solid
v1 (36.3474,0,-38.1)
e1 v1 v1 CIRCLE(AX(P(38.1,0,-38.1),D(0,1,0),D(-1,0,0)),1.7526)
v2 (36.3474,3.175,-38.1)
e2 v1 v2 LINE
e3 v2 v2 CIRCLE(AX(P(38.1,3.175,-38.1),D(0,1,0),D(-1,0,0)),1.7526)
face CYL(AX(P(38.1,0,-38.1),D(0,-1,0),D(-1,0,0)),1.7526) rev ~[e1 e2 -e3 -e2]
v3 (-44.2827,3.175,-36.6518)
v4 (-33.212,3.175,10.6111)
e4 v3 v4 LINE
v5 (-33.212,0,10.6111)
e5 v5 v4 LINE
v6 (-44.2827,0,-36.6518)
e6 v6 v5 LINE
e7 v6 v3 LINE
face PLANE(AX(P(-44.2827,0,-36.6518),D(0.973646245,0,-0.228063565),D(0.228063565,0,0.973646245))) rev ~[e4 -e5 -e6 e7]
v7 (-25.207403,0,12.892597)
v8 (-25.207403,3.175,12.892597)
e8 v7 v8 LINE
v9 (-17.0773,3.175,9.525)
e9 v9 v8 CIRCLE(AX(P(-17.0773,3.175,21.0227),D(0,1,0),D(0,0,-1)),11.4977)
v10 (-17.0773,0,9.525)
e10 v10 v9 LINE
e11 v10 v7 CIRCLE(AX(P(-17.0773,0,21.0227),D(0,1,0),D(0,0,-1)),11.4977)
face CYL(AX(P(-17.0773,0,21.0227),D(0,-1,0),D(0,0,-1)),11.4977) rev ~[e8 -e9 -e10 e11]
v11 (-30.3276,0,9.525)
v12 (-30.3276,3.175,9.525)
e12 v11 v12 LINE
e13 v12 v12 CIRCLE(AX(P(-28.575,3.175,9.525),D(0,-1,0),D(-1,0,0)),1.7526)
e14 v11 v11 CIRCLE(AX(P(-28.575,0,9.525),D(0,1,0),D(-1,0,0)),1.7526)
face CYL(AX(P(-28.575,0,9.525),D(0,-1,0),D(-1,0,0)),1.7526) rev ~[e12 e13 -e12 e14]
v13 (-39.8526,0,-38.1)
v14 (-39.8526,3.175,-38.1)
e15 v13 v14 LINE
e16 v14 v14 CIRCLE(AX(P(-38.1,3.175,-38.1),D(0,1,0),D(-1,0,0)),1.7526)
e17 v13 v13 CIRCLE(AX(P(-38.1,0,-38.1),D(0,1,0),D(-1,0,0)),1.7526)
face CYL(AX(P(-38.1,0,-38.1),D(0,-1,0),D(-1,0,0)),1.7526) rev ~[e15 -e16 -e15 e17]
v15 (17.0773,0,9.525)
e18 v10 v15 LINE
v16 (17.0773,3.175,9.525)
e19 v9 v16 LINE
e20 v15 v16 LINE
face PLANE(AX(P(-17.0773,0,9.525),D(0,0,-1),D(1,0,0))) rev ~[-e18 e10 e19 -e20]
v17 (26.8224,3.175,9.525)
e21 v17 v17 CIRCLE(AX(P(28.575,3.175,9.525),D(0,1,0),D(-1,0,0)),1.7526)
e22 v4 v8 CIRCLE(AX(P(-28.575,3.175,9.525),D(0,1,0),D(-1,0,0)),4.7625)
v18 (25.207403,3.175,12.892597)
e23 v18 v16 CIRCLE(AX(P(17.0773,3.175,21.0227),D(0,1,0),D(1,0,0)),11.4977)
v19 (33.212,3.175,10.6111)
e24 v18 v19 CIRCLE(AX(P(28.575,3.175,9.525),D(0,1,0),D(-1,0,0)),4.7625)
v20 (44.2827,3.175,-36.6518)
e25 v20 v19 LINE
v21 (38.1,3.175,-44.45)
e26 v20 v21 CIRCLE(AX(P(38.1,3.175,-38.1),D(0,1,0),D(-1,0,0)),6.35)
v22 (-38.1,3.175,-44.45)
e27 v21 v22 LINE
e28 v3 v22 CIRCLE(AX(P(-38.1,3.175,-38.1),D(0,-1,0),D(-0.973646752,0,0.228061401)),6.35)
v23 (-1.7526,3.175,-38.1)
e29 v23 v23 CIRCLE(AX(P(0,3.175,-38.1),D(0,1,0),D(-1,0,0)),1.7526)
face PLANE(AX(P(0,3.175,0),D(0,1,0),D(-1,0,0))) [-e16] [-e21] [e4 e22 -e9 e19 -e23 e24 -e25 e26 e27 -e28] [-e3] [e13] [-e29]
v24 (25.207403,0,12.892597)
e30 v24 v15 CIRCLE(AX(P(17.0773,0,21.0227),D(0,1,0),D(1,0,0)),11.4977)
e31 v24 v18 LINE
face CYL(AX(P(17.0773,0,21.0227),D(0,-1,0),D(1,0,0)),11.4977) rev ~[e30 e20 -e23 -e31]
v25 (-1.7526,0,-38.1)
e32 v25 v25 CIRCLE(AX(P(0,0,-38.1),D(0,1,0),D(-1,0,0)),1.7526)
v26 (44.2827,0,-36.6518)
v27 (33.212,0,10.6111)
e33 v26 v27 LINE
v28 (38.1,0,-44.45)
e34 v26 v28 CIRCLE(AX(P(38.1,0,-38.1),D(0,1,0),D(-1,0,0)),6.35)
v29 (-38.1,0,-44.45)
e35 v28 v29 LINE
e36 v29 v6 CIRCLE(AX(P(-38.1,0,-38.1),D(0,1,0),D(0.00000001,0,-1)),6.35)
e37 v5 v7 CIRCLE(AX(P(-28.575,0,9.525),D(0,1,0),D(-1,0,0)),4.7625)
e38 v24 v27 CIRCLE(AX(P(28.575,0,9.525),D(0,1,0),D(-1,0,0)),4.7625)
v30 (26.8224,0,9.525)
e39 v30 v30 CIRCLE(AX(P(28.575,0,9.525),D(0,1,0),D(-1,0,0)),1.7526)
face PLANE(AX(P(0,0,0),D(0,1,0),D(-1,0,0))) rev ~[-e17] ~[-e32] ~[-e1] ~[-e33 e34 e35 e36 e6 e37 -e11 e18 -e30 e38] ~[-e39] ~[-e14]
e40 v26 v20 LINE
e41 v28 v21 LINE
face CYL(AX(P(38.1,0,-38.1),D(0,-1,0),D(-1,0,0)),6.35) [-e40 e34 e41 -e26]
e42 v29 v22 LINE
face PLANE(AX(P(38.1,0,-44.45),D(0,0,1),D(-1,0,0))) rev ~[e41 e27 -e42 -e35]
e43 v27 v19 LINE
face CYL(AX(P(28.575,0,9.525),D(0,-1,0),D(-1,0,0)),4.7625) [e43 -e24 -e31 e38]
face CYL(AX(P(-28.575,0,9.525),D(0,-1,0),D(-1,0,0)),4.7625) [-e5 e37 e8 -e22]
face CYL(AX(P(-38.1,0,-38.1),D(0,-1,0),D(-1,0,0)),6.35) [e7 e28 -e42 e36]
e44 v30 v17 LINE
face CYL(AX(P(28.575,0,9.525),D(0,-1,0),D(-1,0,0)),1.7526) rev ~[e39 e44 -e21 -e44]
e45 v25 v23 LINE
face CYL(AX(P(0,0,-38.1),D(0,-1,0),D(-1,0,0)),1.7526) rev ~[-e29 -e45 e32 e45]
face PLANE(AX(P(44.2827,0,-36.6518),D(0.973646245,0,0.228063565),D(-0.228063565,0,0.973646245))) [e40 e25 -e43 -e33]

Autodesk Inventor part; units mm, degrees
ref_plane "YZ Plane" through (0, 0, 0) normal (1, 0, 0) x (0, 1, 0)
ref_plane "XZ Plane" through (0, 0, 0) normal (0, 1, 0) x (-1, 0, 0)
ref_plane "XY Plane" through (0, 0, 0) normal (0, 0, 1) x (1, 0, 0)
sketch "Sketch1" plane through (0, 0, 0) normal (0, 1, 0) x (-1, 0, 0)
  line L0 (101.6, 38.1) -> (-101.6, 38.1) construction
  line L1 (-101.6, 38.1) -> (-101.6, -38.1) construction
  line L2 (-101.6, -38.1) -> (101.6, -38.1) construction
  line L3 (101.6, -38.1) -> (101.6, 38.1) construction
  line L4 (101.6, 38.1) -> (-101.6, -38.1) construction
  line L5 (-101.6, 38.1) -> (101.6, -38.1) construction
  line L6 (-28.575, 66.675) -> (28.575, 66.675) construction
  line L7 (28.575, 66.675) -> (28.575, 9.525) construction
  line L8 (28.575, 9.525) -> (-28.575, 9.525)
  line L9 (-28.575, 9.525) -> (-28.575, 66.675) construction
  line L10 (-28.575, 66.675) -> (28.575, 9.525) construction
  line L11 (28.575, 66.675) -> (-28.575, 9.525) construction
  circle A0 centre (-38.1, 50.8) radius 3.175 construction
  line L12 (0, 38.1) -> (0, -38.1) construction
  circle A1 centre (-38.1, 50.8) radius 9.525 construction
  line L13 (-38.1, 60.325) -> (-28.575, 60.325) construction
  circle A2 centre (38.1, 50.8) radius 3.175 construction
  circle A3 centre (38.1, 50.8) radius 9.525 construction
  line L14 (38.1, 60.325) -> (28.575, 60.325) construction
  circle A4 centre (-76.2, -38.1) radius 1.7526 construction
  circle A5 centre (-95.25, 3.175) radius 1.7526 construction
  circle A6 centre (76.2, -38.1) radius 1.7526 construction
  circle A7 centre (95.25, 3.175) radius 1.7526 construction
  line L15 (-101.6, -38.1) -> (-101.6, 6.35) construction
  line L16 (-101.6, 6.35) -> (-44.4797, 57.8728) construction
  line L17 (101.6, -38.1) -> (101.6, 6.35) construction
  line L18 (101.6, 6.35) -> (44.4797, 57.8728) construction
  line L19 (-42.6417, 42.4275) -> (-87.975, 1.5367) construction
  line L20 (-87.975, 1.5367) -> (-87.975, -38.1) construction
  line L21 (87.975, -38.1) -> (87.975, 1.5367) construction
  line L22 (87.975, 1.5367) -> (42.6417, 42.4275) construction
  line L23 (0, -38.1) -> (-95.25, -38.1) construction
  line L24 (0, -38.1) -> (95.25, -38.1) construction
  circle A8 centre (-60.325, 35.0287) radius 1.7526 construction
  circle A9 centre (-33.3375, 31.75) radius 1.7526 construction
  line L25 (-38.1, 0) -> (-38.1, 41.275) construction
  line L26 (-38.1, 0) -> (0, 0) construction
  circle A10 centre (60.325, 35.0287) radius 1.7526 construction
  circle A11 centre (33.3375, 31.75) radius 1.7526 construction
  line L27 (38.1, 0) -> (38.1, 41.275) construction
  line L28 (38.1, 0) -> (0, 0) construction
  line L29 (-87.975, 0) -> (-65.115, 0) construction
  line L30 (-65.115, 0) -> (-65.115, -31.75) construction
  line L31 (-65.115, -31.75) -> (-87.975, -31.75) construction
  line L32 (-101.6, -38.1) -> (101.6, -38.1) construction
  line L33 (101.6, -38.1) -> (101.6, 19.05) construction
  line L34 (101.6, 19.05) -> (-101.6, 19.05) construction
  line L35 (-101.6, 19.05) -> (-101.6, -38.1) construction
  line L36 (-101.6, 19.05) -> (-87.5203, 19.05) construction
  line L37 (87.5203, 19.05) -> (101.6, 19.05) construction
  circle A12 centre (-38.1, 0) radius 3.175 construction
  circle A13 centre (-38.1, 0) radius 6.35 construction
  circle A14 centre (38.1, 0) radius 3.175 construction
  circle A15 centre (38.1, 0) radius 6.35 construction
  circle A16 centre (28.575, 9.525) radius 1.7526
  circle A17 centre (28.575, 9.525) radius 4.7625
  arc A18 (17.0773, 9.525) -> (28.575, 21.0227) centre (17.0773, 21.0227) ccw
  circle A19 centre (-28.575, 9.525) radius 1.7526
  circle A20 centre (-28.575, 9.525) radius 4.7625
  arc A21 (-28.575, 21.0227) -> (-17.0773, 9.525) centre (-17.0773, 21.0227) ccw
  arc A22 (31.4325, 5.715) -> (38.1, 19.05) centre (21.4312, 19.05) ccw construction
  arc A23 (-38.1, 19.05) -> (-31.4325, 5.715) centre (-21.4312, 19.05) ccw construction
  line L38 (-61.94, -38.1) -> (-61.94, 25.0204) construction
  line L39 (87.975, 0) -> (65.115, 0) construction
  line L40 (65.115, 0) -> (65.115, -31.75) construction
  line L41 (65.115, -31.75) -> (87.975, -31.75) construction
  line L42 (61.94, -38.1) -> (61.94, 25.0204) construction
  line L43 (-28.575, 4.7625) -> (28.575, 4.7625) construction
  line L44 (101.6, -31.75) -> (-101.6, -31.75) construction
  line L45 (-101.6, -31.75) -> (-101.6, -44.45) construction
  line L46 (-101.6, -44.45) -> (101.6, -44.45)
  line L47 (101.6, -44.45) -> (101.6, -31.75) construction
  circle A24 centre (0, -38.1) radius 1.7526
  circle A25 centre (38.1, -38.1) radius 1.7526
  circle A26 centre (-38.1, -38.1) radius 1.7526
  line L48 (101.6, -38.1) -> (76.2, -44.45) construction
  line L49 (-101.6, -38.1) -> (-76.2, -44.45) construction
  line L50 (76.2, -38.1) -> (76.2, -44.45) construction
  line L51 (-76.2, -38.1) -> (-76.2, -44.45) construction
  line L52 (59.1924, 41.2769) -> (32.488, 36.4361) construction
  circle A27 centre (60.325, 35.0287) radius 6.35 construction
  circle A28 centre (33.3375, 31.75) radius 4.7625 construction
  line L53 (-59.1924, 41.2769) -> (-32.488, 36.4361) construction
  circle A29 centre (-60.325, 35.0287) radius 6.35 construction
  circle A30 centre (-33.3375, 31.75) radius 4.7625 construction
  line L54 (-87.975, 0) -> (-65.115, 0) construction
  line L55 (-65.115, 0) -> (-65.115, -3.175) construction
  line L56 (-65.115, -3.175) -> (-87.975, -3.175) construction
  line L57 (-87.975, -3.175) -> (-87.975, 0) construction
  line L58 (-65.115, -15.875) -> (-87.975, -15.875) construction
  line L59 (-65.115, -28.575) -> (-87.975, -28.575) construction
  line L60 (-84.8, -38.1) -> (-84.8, 0.1248) construction
  line L61 (65.115, -3.175) -> (87.975, -3.175) construction
  line L62 (65.115, -15.875) -> (87.975, -15.875) construction
  line L63 (65.115, -28.575) -> (87.975, -28.575) construction
  line L64 (84.8, -38.1) -> (84.8, 0.1248) construction
  line L65 (-31.75, -31.75) -> (31.75, -31.75) construction
  line L66 (31.75, -31.75) -> (31.75, 0) construction
  line L67 (31.75, 0) -> (-31.75, 0) construction
  line L68 (-31.75, 0) -> (-31.75, -31.75) construction
  circle A31 centre (71.465, 12.7) radius 3.175 construction
  circle A32 centre (-71.465, 12.7) radius 3.175 construction
  circle A33 centre (38.1, -38.1) radius 6.35
  circle A34 centre (-38.1, -38.1) radius 6.35
  line L69 (44.2827, -36.6518) -> (33.212, 10.6111)
  line L70 (-44.2827, -36.6518) -> (-33.212, 10.6111)
  point P0 (28.575, 38.1)
  point P1 (-28.575, 38.1)
  point P2 (28.575, 60.325)
  point P3 (44.4797, 57.8728)
  point P4 (101.6, -15.875)
  point P5 (38.1, 41.275)
  point P6 (-87.975, -31.75)
  point P7 (-101.6, 6.35)
  point P8 (101.6, 6.35)
  point P9 (31.75, 0)
  point P10 (38.1, 6.35)
  point P11 (-38.1, 6.35)
  point P12 (-31.75, 0)
  point P13 (87.975, 0)
  point P14 (61.94, 25.0204)
  point P15 (-17.0773, 9.525)
  point P16 (-28.575, 21.0227)
  point P17 (-38.1, 19.05)
  point P18 (-31.4325, 5.715)
  point P19 (-21.8502, 0)
  point P20 (21.8502, 0)
  point P21 (-25.2074, 12.8926)
  point P22 (-28.575, 14.2875)
  point P23 (-23.8125, 9.525)
  point P24 (-28.575, 50.8)
  point P25 (25.2074, 12.8926)
  point P26 (28.575, 14.2875)
  point P27 (23.8125, 9.525)
  point P28 (28.575, 50.8)
  point P29 (26.8224, 9.525)
  point P30 (28.575, 11.2776)
  point P31 (61.94, -31.75)
  point P32 (-61.94, -31.75)
  point P33 (-28.575, 31.75)
  point P34 (-64.5781, 39.7439)
  point P35 (64.5781, 39.7439)
  point P36 (28.575, 31.75)
  point P37 (-84.8, -3.175)
  point P38 (-84.8, -28.575)
  point P39 (84.8, -3.175)
  point P40 (84.8, -28.575)
  point P41 (31.75, -31.75)
  point P42 (-101.6, -31.75)
  point P43 (31.75, -31.75)
  point P44 (-26.8224, 9.525)
  point P45 (-28.575, 11.2776)
  point P46 (-39.8526, -38.1)
  point P47 (-36.3474, -38.1)
  point P48 (-1.7526, -38.1)
  point P49 (1.7526, -38.1)
  point P50 (36.3474, -38.1)
  point P51 (39.8526, -38.1)
  point P52 (-38.1, -44.45)
  point P53 (38.1, -44.45)
  dimension "d2" = 3.175
  dimension "d3" = 0
  dimension "d0" = 203.2
  dimension "d1" = 76.2
  dimension "d4" = 57.15
  dimension "d6" = 6.35
  dimension "d7" = 38.1
  dimension "d8" = 19.05
  dimension "d10" = 3.5052
  dimension "d11" = 3.5052
  dimension "d12" = 0
  dimension "d14" = 25.4
  dimension "d15" = 6.35
  dimension "d20" = 50.8
  dimension "d21" = 41.275
  dimension "d22" = 44.45
  dimension "d24" = 12.7
  dimension "d25" = 13.625
  dimension "d26" = 12.7
  dimension "d27" = 13.625
  dimension "d31" = 3.5052
  dimension "d32" = 3.5052
  dimension "d33" = 6.35
  dimension "d34" = 31.75
  dimension "d35" = 4.7625
  dimension "d36" = 22.225
  dimension "d37" = 9.525
  dimension "d39" = 31.75
  dimension "d40" = 6.35
  dimension "d42" = 57.15
  dimension "d43" = 6.35
  dimension "d44" = 9.525
  dimension "d45" = 9.525
  dimension "d46" = 12.7
  dimension "d104" = 3.5052
  dimension "d105" = 9.525
  dimension "d106" = 3.175
  dimension "d107" = 22.86
  dimension "d123" = 88.9
  dimension "d124" = 12.7
  dimension "d125" = 3.5052
  dimension "d126" = 3.5052
  dimension "d127" = 38.1
  dimension "d128" = 28.575
  dimension "d129" = 3.175
  dimension "d130" = 3.175
  dimension "d131" = 31.75
  dimension "d132" = 31.75
  dimension "d133" = 31.75
  dimension "d135" = 6.35
  dimension "d136" = 12.7
  dimension "d137" = 9.525
extrude "Extrusion1" add sketch "Sketch1" along normal blind 3.175
equation "\"d35\" = 0.5 * d37"
properties part number "Cover (Outer)" material "UHMW, White"
